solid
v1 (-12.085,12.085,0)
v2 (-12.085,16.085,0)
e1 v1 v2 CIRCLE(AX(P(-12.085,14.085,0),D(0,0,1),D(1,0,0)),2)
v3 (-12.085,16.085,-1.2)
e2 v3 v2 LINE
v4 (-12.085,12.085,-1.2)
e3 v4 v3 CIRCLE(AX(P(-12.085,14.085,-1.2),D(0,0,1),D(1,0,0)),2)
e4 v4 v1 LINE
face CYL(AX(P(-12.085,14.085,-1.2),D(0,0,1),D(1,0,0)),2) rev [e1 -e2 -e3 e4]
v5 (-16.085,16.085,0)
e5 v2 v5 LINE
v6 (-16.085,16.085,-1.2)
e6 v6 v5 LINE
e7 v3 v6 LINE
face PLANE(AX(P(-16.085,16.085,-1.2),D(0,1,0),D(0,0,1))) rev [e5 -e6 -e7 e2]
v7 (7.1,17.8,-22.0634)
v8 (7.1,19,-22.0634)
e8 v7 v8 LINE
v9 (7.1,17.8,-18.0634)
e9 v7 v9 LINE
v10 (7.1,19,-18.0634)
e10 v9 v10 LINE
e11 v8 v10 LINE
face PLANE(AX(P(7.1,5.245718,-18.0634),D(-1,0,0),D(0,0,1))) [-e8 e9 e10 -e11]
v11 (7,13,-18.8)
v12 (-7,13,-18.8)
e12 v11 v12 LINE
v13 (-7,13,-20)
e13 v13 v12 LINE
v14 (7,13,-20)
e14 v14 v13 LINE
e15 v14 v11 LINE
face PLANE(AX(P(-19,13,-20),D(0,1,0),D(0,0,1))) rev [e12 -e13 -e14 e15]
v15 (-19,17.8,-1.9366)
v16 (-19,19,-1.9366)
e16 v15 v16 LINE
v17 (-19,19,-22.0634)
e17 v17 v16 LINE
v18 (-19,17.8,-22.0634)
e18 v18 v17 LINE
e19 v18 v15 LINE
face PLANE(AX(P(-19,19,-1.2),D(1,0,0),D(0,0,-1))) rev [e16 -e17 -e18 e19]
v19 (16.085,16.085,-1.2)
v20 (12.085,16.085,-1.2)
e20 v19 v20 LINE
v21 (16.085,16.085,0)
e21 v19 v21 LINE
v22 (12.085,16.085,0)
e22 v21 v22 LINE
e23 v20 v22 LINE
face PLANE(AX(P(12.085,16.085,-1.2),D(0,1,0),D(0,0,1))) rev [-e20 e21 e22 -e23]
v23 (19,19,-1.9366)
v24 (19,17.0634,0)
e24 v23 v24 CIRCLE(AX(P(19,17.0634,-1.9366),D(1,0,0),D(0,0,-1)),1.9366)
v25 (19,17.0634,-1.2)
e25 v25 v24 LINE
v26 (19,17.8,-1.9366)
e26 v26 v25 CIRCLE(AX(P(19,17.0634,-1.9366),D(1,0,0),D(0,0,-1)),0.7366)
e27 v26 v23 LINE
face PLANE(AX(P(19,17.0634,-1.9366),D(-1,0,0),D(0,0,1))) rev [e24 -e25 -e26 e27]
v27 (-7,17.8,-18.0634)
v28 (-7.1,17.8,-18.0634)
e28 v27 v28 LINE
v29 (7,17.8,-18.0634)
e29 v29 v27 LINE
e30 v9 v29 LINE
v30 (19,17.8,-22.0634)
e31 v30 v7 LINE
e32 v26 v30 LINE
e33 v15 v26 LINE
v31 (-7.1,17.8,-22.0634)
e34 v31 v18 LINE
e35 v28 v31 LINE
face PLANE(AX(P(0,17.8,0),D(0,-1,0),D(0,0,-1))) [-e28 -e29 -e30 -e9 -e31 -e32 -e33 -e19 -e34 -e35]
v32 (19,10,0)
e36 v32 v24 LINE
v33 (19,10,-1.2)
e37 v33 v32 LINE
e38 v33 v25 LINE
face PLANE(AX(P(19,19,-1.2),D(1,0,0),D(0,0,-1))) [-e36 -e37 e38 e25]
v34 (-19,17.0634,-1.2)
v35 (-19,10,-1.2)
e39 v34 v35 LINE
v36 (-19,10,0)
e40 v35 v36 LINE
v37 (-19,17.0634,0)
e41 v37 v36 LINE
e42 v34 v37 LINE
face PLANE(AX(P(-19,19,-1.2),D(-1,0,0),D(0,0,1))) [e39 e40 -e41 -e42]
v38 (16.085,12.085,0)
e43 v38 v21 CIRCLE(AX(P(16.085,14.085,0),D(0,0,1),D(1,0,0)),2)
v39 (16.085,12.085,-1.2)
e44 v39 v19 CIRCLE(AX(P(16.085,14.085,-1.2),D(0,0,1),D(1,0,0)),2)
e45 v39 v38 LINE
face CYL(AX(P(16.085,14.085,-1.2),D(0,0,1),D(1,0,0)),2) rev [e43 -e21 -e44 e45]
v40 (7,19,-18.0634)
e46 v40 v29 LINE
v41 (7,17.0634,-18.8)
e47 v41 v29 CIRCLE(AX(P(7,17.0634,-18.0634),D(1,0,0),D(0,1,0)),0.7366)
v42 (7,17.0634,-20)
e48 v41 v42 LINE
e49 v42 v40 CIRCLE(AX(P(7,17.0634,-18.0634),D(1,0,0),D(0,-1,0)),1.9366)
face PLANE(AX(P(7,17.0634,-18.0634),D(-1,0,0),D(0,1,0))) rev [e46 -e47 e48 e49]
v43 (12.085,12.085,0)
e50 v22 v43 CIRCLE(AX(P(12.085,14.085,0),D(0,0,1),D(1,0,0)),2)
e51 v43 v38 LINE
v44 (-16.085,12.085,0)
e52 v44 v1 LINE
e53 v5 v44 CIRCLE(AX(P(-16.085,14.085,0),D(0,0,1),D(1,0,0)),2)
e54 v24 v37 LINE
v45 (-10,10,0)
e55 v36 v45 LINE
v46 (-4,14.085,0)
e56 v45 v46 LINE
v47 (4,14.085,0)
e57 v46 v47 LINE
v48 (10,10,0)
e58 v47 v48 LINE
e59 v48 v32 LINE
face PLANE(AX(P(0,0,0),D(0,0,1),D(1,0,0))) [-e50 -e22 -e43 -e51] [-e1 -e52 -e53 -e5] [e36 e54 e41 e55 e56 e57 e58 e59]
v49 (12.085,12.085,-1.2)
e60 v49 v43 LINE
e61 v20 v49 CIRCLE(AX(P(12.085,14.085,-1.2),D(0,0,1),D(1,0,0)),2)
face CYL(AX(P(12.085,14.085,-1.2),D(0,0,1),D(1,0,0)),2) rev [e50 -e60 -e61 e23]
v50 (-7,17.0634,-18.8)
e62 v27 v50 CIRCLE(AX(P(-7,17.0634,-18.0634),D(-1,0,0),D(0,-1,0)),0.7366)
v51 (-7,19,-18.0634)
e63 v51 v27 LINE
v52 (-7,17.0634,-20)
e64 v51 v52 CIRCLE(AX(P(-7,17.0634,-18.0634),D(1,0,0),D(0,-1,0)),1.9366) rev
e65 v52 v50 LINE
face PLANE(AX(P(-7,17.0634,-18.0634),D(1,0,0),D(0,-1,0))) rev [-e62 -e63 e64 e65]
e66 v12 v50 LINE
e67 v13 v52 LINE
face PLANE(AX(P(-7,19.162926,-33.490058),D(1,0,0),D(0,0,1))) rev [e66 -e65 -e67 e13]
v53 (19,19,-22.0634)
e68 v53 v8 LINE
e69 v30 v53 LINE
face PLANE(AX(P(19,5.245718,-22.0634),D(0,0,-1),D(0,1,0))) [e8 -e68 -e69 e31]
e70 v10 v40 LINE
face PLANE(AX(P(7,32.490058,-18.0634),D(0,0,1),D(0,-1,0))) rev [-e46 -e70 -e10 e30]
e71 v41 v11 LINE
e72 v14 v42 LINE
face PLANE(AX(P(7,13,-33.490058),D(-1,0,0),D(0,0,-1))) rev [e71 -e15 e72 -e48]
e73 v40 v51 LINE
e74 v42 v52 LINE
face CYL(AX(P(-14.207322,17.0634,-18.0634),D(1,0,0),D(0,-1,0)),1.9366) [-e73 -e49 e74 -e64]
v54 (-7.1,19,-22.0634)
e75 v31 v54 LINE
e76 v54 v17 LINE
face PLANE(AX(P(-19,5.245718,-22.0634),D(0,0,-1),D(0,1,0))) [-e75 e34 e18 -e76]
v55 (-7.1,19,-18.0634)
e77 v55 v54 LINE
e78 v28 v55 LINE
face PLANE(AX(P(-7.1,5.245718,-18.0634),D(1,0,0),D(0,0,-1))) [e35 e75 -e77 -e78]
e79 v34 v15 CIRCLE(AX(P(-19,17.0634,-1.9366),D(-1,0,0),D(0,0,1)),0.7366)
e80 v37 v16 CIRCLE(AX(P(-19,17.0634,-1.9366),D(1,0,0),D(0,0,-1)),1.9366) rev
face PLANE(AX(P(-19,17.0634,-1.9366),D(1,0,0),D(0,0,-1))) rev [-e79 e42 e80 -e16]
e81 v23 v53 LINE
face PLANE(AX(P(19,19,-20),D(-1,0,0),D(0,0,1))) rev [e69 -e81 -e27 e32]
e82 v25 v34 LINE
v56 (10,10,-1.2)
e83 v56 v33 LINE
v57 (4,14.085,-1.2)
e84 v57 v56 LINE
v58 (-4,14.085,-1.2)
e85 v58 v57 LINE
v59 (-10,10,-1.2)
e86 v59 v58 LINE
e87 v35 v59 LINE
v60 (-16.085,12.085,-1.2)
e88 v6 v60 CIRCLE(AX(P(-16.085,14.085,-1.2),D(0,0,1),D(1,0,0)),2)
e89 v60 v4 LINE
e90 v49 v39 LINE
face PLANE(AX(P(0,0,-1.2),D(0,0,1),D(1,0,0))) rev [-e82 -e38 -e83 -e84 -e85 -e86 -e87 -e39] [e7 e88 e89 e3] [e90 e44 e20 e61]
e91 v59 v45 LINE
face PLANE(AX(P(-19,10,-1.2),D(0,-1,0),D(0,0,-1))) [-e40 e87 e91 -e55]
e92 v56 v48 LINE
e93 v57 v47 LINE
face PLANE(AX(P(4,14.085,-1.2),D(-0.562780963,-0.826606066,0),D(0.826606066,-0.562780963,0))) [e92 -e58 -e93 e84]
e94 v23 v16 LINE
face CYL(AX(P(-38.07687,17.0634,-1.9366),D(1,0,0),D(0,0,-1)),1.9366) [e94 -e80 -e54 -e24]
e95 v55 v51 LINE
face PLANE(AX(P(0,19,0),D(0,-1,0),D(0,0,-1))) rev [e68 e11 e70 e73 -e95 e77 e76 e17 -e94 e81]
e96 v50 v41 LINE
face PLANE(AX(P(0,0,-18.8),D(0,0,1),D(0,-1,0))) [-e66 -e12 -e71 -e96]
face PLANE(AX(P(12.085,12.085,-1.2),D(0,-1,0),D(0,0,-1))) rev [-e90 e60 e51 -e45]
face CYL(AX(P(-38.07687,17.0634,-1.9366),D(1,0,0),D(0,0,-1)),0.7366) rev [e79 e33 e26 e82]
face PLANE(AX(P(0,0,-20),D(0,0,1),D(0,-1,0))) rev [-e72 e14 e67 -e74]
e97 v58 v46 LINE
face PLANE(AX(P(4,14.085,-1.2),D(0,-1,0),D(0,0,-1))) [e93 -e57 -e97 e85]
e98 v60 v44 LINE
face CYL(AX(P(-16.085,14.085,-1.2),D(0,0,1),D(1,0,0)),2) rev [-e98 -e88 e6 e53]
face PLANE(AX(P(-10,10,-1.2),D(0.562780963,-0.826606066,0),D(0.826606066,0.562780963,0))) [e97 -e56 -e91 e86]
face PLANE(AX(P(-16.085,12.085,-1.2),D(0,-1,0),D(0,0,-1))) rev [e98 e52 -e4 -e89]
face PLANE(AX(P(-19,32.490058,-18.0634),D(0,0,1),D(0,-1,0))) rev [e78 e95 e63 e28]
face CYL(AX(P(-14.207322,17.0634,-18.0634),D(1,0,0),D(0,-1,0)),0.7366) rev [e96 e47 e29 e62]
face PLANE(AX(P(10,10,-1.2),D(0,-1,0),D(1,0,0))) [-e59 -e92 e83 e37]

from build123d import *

# Parameters (mm, degrees)
BRIDA_BASE1_DEPTH                = 1.2
BRIDA_DE_ARISTA1_STRIP_W         = 6.2732
BRIDA_DE_ARISTA1_STRIP_H         = 1.2
BRIDA_DE_ARISTA1_STRIP_CUT_DEPTH = 38
BRIDA_DE_ARISTA1_DEPTH           = 38
BRIDA_DE_ARISTA2_STRIP_W         = 6.2732
BRIDA_DE_ARISTA2_STRIP_H         = 1.2
BRIDA_DE_ARISTA2_STRIP_CUT_DEPTH = 38
BRIDA_DE_ARISTA2_DEPTH           = 38
DESDOBLAR1_START                 = -19
DESDOBLAR1_DEPTH                 = 38
DESDOBLAR1_2_DEPTH               = 38
CROQUIS14_W                      = 12
CROQUIS14_H                      = 6.162926371
CORTAR_EXTRUIR1_DEPTH            = 1.2
DOBLAR1_START                    = -19
DOBLAR1_DEPTH                    = 38
DOBLAR1_2_DEPTH                  = 38
DOBLAR1_START_2                  = -7
DOBLAR1_3_DEPTH                  = 14
CROQUIS16_W                      = 11.9
CROQUIS16_H                      = 4
SALIENTE_EXTRUIR1_DEPTH          = 1.2


# Read off the part's stored shape, not the designer's step: Desdoblar1, Doblar1
# Sheet-metal steps are written as plain solids
with BuildPart() as part:
    # Croquis1 → Brida base1 (new body)
    with BuildSketch(Plane.XY):
        Polygon((-19, 19), (19, 19), (19, 10), (10, 10), (4, 14.085), (-4, 14.085), (-10, 10), (-19, 10), align=None)
        with BuildLine():
            Line((-16.085, 16.085), (-12.085, 16.085))
            ThreePointArc((-12.085, 16.085), (-10.085, 14.085), (-12.085, 12.085))
            Line((-12.085, 12.085), (-16.085, 12.085))
            ThreePointArc((-16.085, 12.085), (-18.085, 14.085), (-16.085, 16.085))
        make_face(mode=Mode.SUBTRACT)
        with BuildLine():
            Line((12.085, 16.085), (16.085, 16.085))
            ThreePointArc((16.085, 16.085), (18.085, 14.085), (16.085, 12.085))
            Line((16.085, 12.085), (12.085, 12.085))
            ThreePointArc((12.085, 12.085), (10.085, 14.085), (12.085, 16.085))
        make_face(mode=Mode.SUBTRACT)
    extrude(amount=-BRIDA_BASE1_DEPTH)

    # Brida de arista1 strip (across the edge) → Brida de arista1 strip cut (cut)
    with BuildSketch(Plane(origin=(-19, 19, -1.2), x_dir=(0, -1, 0), z_dir=(1, 0, 0))):
        with Locations((-1.2, -0.6)):
            Rectangle(BRIDA_DE_ARISTA1_STRIP_W, BRIDA_DE_ARISTA1_STRIP_H)
    extrude(amount=BRIDA_DE_ARISTA1_STRIP_CUT_DEPTH, mode=Mode.SUBTRACT)

    # Brida de arista1 section (across the edge) → Brida de arista1 (add)
    with BuildSketch(Plane(origin=(-19, 19, -1.2), x_dir=(0, -1, 0), z_dir=(1, 0, 0))):
        with BuildLine():
            Line((0, 0.7366), (0, 18.8))
            Line((0, 18.8), (1.2, 18.8))
            Line((1.2, 18.8), (1.2, 0.7366))
            ThreePointArc((1.2, 0.7366), (1.415745145, 0.215745145), (1.9366, 0))
            Line((1.9366, 0), (1.9366, -1.2))
            ThreePointArc((1.9366, -1.2), (0.567217008, -0.632782992), (0, 0.7366))
        make_face()
    extrude(amount=BRIDA_DE_ARISTA1_DEPTH)

    # Brida de arista2 strip (across the edge) → Brida de arista2 strip cut (cut)
    with BuildSketch(Plane(origin=(-19, 17.8, -20), x_dir=(0, 0, 1), z_dir=(1, 0, 0))):
        with Locations((-1.2, -0.6)):
            Rectangle(BRIDA_DE_ARISTA2_STRIP_W, BRIDA_DE_ARISTA2_STRIP_H)
    extrude(amount=BRIDA_DE_ARISTA2_STRIP_CUT_DEPTH, mode=Mode.SUBTRACT)

    # Brida de arista2 section (across the edge) → Brida de arista2 (add)
    with BuildSketch(Plane(origin=(-19, 17.8, -20), x_dir=(0, 0, 1), z_dir=(1, 0, 0))):
        with BuildLine():
            Line((0, 0.7366), (0, 4.8))
            Line((0, 4.8), (1.2, 4.8))
            Line((1.2, 4.8), (1.2, 0.7366))
            ThreePointArc((1.2, 0.7366), (1.415745145, 0.215745145), (1.9366, 0))
            Line((1.9366, 0), (1.9366, -1.2))
            ThreePointArc((1.9366, -1.2), (0.567217008, -0.632782992), (0, 0.7366))
        make_face()
    extrude(amount=BRIDA_DE_ARISTA2_DEPTH)

    # Desdoblar1 outline → Desdoblar1 (cut)
    with BuildSketch(Plane.YZ.offset(DESDOBLAR1_START)):
        with BuildLine():
            ThreePointArc((19, -1.9366), (18.963262642, -1.561178238), (18.854444388, -1.2))
            Line((18.854444388, -1.2), (17.0634, -1.2))
            ThreePointArc((17.0634, -1.2), (17.584254855, -1.415745145), (17.8, -1.9366))
            Line((17.8, -1.9366), (17.8, -18.0634))
            ThreePointArc((17.8, -18.0634), (17.584254855, -18.584254855), (17.0634, -18.8))
            Line((17.0634, -18.8), (13, -18.8))
            Line((13, -18.8), (13, -20))
            Line((13, -20), (17.0634, -20))
            ThreePointArc((17.0634, -20), (18.432782992, -19.432782992), (19, -18.0634))
            Line((19, -18.0634), (19, -1.9366))
        make_face()
    extrude(amount=DESDOBLAR1_DEPTH, mode=Mode.SUBTRACT)

    # Desdoblar1 2 outline → Desdoblar1 2 (add)
    with BuildSketch(Plane.YZ.offset(DESDOBLAR1_START)):
        with BuildLine():
            Line((41.452652741, 0), (17.0634, 0))
            ThreePointArc((17.0634, 0), (18.141342484, -0.327730969), (18.854444388, -1.2))
            Line((18.854444388, -1.2), (41.452652741, -1.2))
            Line((41.452652741, -1.2), (41.452652741, 0))
        make_face()
    extrude(amount=DESDOBLAR1_2_DEPTH)

    # Croquis14 → Cortar-Extruir1 (cut)
    with BuildSketch(Plane(origin=(0, 0, -1.2), x_dir=(-1, 0, 0), z_dir=(0, 0, -1))):
        with Locations((13, 38.371189556)):
            Rectangle(CROQUIS14_W, CROQUIS14_H)
        with Locations((-13, 38.371189556)):
            Rectangle(CROQUIS14_W, CROQUIS14_H)
    extrude(amount=-CORTAR_EXTRUIR1_DEPTH, mode=Mode.SUBTRACT)

    # Doblar1 outline → Doblar1 (cut)
    with BuildSketch(Plane.YZ.offset(DOBLAR1_START)):
        with BuildLine():
            ThreePointArc((17.0634, 0), (18.141342484, -0.327730969), (18.854444388, -1.2))
            Line((18.854444388, -1.2), (41.452652741, -1.2))
            Line((41.452652741, -1.2), (41.452652741, 0))
            Line((41.452652741, 0), (17.0634, 0))
        make_face()
    extrude(amount=DOBLAR1_DEPTH, mode=Mode.SUBTRACT)

    # Doblar1 2 outline → Doblar1 2 (add)
    with BuildSketch(Plane.YZ.offset(DOBLAR1_START)):
        with BuildLine():
            Line((19, -18.0634), (19, -1.9366))
            ThreePointArc((19, -1.9366), (18.963262642, -1.561178238), (18.854444388, -1.2))
            Line((18.854444388, -1.2), (17.0634, -1.2))
            ThreePointArc((17.0634, -1.2), (17.584254855, -1.415745145), (17.8, -1.9366))
            Line((17.8, -1.9366), (17.8, -18.0634))
            Line((17.8, -18.0634), (19, -18.0634))
        make_face()
    extrude(amount=DOBLAR1_2_DEPTH)

    # Doblar1 3 outline → Doblar1 3 (add)
    with BuildSketch(Plane.YZ.offset(DOBLAR1_START_2)):
        with BuildLine():
            ThreePointArc((17.0634, -20), (18.432782992, -19.432782992), (19, -18.0634))
            Line((19, -18.0634), (17.8, -18.0634))
            ThreePointArc((17.8, -18.0634), (17.584254855, -18.584254855), (17.0634, -18.8))
            Line((17.0634, -18.8), (13, -18.8))
            Line((13, -18.8), (13, -20))
            Line((13, -20), (17.0634, -20))
        make_face()
    extrude(amount=DOBLAR1_3_DEPTH)

    # Croquis16 → Saliente-Extruir1 (add)
    with BuildSketch(Plane(origin=(0, 19, 0), x_dir=(1, 0, 0), z_dir=(0, 1, 0))):
        with Locations((-13.05, 20.0634)):
            Rectangle(CROQUIS16_W, CROQUIS16_H)
        with Locations((13.05, 20.0634)):
            Rectangle(CROQUIS16_W, CROQUIS16_H)
    extrude(amount=-SALIENTE_EXTRUIR1_DEPTH)


solid = part.part
